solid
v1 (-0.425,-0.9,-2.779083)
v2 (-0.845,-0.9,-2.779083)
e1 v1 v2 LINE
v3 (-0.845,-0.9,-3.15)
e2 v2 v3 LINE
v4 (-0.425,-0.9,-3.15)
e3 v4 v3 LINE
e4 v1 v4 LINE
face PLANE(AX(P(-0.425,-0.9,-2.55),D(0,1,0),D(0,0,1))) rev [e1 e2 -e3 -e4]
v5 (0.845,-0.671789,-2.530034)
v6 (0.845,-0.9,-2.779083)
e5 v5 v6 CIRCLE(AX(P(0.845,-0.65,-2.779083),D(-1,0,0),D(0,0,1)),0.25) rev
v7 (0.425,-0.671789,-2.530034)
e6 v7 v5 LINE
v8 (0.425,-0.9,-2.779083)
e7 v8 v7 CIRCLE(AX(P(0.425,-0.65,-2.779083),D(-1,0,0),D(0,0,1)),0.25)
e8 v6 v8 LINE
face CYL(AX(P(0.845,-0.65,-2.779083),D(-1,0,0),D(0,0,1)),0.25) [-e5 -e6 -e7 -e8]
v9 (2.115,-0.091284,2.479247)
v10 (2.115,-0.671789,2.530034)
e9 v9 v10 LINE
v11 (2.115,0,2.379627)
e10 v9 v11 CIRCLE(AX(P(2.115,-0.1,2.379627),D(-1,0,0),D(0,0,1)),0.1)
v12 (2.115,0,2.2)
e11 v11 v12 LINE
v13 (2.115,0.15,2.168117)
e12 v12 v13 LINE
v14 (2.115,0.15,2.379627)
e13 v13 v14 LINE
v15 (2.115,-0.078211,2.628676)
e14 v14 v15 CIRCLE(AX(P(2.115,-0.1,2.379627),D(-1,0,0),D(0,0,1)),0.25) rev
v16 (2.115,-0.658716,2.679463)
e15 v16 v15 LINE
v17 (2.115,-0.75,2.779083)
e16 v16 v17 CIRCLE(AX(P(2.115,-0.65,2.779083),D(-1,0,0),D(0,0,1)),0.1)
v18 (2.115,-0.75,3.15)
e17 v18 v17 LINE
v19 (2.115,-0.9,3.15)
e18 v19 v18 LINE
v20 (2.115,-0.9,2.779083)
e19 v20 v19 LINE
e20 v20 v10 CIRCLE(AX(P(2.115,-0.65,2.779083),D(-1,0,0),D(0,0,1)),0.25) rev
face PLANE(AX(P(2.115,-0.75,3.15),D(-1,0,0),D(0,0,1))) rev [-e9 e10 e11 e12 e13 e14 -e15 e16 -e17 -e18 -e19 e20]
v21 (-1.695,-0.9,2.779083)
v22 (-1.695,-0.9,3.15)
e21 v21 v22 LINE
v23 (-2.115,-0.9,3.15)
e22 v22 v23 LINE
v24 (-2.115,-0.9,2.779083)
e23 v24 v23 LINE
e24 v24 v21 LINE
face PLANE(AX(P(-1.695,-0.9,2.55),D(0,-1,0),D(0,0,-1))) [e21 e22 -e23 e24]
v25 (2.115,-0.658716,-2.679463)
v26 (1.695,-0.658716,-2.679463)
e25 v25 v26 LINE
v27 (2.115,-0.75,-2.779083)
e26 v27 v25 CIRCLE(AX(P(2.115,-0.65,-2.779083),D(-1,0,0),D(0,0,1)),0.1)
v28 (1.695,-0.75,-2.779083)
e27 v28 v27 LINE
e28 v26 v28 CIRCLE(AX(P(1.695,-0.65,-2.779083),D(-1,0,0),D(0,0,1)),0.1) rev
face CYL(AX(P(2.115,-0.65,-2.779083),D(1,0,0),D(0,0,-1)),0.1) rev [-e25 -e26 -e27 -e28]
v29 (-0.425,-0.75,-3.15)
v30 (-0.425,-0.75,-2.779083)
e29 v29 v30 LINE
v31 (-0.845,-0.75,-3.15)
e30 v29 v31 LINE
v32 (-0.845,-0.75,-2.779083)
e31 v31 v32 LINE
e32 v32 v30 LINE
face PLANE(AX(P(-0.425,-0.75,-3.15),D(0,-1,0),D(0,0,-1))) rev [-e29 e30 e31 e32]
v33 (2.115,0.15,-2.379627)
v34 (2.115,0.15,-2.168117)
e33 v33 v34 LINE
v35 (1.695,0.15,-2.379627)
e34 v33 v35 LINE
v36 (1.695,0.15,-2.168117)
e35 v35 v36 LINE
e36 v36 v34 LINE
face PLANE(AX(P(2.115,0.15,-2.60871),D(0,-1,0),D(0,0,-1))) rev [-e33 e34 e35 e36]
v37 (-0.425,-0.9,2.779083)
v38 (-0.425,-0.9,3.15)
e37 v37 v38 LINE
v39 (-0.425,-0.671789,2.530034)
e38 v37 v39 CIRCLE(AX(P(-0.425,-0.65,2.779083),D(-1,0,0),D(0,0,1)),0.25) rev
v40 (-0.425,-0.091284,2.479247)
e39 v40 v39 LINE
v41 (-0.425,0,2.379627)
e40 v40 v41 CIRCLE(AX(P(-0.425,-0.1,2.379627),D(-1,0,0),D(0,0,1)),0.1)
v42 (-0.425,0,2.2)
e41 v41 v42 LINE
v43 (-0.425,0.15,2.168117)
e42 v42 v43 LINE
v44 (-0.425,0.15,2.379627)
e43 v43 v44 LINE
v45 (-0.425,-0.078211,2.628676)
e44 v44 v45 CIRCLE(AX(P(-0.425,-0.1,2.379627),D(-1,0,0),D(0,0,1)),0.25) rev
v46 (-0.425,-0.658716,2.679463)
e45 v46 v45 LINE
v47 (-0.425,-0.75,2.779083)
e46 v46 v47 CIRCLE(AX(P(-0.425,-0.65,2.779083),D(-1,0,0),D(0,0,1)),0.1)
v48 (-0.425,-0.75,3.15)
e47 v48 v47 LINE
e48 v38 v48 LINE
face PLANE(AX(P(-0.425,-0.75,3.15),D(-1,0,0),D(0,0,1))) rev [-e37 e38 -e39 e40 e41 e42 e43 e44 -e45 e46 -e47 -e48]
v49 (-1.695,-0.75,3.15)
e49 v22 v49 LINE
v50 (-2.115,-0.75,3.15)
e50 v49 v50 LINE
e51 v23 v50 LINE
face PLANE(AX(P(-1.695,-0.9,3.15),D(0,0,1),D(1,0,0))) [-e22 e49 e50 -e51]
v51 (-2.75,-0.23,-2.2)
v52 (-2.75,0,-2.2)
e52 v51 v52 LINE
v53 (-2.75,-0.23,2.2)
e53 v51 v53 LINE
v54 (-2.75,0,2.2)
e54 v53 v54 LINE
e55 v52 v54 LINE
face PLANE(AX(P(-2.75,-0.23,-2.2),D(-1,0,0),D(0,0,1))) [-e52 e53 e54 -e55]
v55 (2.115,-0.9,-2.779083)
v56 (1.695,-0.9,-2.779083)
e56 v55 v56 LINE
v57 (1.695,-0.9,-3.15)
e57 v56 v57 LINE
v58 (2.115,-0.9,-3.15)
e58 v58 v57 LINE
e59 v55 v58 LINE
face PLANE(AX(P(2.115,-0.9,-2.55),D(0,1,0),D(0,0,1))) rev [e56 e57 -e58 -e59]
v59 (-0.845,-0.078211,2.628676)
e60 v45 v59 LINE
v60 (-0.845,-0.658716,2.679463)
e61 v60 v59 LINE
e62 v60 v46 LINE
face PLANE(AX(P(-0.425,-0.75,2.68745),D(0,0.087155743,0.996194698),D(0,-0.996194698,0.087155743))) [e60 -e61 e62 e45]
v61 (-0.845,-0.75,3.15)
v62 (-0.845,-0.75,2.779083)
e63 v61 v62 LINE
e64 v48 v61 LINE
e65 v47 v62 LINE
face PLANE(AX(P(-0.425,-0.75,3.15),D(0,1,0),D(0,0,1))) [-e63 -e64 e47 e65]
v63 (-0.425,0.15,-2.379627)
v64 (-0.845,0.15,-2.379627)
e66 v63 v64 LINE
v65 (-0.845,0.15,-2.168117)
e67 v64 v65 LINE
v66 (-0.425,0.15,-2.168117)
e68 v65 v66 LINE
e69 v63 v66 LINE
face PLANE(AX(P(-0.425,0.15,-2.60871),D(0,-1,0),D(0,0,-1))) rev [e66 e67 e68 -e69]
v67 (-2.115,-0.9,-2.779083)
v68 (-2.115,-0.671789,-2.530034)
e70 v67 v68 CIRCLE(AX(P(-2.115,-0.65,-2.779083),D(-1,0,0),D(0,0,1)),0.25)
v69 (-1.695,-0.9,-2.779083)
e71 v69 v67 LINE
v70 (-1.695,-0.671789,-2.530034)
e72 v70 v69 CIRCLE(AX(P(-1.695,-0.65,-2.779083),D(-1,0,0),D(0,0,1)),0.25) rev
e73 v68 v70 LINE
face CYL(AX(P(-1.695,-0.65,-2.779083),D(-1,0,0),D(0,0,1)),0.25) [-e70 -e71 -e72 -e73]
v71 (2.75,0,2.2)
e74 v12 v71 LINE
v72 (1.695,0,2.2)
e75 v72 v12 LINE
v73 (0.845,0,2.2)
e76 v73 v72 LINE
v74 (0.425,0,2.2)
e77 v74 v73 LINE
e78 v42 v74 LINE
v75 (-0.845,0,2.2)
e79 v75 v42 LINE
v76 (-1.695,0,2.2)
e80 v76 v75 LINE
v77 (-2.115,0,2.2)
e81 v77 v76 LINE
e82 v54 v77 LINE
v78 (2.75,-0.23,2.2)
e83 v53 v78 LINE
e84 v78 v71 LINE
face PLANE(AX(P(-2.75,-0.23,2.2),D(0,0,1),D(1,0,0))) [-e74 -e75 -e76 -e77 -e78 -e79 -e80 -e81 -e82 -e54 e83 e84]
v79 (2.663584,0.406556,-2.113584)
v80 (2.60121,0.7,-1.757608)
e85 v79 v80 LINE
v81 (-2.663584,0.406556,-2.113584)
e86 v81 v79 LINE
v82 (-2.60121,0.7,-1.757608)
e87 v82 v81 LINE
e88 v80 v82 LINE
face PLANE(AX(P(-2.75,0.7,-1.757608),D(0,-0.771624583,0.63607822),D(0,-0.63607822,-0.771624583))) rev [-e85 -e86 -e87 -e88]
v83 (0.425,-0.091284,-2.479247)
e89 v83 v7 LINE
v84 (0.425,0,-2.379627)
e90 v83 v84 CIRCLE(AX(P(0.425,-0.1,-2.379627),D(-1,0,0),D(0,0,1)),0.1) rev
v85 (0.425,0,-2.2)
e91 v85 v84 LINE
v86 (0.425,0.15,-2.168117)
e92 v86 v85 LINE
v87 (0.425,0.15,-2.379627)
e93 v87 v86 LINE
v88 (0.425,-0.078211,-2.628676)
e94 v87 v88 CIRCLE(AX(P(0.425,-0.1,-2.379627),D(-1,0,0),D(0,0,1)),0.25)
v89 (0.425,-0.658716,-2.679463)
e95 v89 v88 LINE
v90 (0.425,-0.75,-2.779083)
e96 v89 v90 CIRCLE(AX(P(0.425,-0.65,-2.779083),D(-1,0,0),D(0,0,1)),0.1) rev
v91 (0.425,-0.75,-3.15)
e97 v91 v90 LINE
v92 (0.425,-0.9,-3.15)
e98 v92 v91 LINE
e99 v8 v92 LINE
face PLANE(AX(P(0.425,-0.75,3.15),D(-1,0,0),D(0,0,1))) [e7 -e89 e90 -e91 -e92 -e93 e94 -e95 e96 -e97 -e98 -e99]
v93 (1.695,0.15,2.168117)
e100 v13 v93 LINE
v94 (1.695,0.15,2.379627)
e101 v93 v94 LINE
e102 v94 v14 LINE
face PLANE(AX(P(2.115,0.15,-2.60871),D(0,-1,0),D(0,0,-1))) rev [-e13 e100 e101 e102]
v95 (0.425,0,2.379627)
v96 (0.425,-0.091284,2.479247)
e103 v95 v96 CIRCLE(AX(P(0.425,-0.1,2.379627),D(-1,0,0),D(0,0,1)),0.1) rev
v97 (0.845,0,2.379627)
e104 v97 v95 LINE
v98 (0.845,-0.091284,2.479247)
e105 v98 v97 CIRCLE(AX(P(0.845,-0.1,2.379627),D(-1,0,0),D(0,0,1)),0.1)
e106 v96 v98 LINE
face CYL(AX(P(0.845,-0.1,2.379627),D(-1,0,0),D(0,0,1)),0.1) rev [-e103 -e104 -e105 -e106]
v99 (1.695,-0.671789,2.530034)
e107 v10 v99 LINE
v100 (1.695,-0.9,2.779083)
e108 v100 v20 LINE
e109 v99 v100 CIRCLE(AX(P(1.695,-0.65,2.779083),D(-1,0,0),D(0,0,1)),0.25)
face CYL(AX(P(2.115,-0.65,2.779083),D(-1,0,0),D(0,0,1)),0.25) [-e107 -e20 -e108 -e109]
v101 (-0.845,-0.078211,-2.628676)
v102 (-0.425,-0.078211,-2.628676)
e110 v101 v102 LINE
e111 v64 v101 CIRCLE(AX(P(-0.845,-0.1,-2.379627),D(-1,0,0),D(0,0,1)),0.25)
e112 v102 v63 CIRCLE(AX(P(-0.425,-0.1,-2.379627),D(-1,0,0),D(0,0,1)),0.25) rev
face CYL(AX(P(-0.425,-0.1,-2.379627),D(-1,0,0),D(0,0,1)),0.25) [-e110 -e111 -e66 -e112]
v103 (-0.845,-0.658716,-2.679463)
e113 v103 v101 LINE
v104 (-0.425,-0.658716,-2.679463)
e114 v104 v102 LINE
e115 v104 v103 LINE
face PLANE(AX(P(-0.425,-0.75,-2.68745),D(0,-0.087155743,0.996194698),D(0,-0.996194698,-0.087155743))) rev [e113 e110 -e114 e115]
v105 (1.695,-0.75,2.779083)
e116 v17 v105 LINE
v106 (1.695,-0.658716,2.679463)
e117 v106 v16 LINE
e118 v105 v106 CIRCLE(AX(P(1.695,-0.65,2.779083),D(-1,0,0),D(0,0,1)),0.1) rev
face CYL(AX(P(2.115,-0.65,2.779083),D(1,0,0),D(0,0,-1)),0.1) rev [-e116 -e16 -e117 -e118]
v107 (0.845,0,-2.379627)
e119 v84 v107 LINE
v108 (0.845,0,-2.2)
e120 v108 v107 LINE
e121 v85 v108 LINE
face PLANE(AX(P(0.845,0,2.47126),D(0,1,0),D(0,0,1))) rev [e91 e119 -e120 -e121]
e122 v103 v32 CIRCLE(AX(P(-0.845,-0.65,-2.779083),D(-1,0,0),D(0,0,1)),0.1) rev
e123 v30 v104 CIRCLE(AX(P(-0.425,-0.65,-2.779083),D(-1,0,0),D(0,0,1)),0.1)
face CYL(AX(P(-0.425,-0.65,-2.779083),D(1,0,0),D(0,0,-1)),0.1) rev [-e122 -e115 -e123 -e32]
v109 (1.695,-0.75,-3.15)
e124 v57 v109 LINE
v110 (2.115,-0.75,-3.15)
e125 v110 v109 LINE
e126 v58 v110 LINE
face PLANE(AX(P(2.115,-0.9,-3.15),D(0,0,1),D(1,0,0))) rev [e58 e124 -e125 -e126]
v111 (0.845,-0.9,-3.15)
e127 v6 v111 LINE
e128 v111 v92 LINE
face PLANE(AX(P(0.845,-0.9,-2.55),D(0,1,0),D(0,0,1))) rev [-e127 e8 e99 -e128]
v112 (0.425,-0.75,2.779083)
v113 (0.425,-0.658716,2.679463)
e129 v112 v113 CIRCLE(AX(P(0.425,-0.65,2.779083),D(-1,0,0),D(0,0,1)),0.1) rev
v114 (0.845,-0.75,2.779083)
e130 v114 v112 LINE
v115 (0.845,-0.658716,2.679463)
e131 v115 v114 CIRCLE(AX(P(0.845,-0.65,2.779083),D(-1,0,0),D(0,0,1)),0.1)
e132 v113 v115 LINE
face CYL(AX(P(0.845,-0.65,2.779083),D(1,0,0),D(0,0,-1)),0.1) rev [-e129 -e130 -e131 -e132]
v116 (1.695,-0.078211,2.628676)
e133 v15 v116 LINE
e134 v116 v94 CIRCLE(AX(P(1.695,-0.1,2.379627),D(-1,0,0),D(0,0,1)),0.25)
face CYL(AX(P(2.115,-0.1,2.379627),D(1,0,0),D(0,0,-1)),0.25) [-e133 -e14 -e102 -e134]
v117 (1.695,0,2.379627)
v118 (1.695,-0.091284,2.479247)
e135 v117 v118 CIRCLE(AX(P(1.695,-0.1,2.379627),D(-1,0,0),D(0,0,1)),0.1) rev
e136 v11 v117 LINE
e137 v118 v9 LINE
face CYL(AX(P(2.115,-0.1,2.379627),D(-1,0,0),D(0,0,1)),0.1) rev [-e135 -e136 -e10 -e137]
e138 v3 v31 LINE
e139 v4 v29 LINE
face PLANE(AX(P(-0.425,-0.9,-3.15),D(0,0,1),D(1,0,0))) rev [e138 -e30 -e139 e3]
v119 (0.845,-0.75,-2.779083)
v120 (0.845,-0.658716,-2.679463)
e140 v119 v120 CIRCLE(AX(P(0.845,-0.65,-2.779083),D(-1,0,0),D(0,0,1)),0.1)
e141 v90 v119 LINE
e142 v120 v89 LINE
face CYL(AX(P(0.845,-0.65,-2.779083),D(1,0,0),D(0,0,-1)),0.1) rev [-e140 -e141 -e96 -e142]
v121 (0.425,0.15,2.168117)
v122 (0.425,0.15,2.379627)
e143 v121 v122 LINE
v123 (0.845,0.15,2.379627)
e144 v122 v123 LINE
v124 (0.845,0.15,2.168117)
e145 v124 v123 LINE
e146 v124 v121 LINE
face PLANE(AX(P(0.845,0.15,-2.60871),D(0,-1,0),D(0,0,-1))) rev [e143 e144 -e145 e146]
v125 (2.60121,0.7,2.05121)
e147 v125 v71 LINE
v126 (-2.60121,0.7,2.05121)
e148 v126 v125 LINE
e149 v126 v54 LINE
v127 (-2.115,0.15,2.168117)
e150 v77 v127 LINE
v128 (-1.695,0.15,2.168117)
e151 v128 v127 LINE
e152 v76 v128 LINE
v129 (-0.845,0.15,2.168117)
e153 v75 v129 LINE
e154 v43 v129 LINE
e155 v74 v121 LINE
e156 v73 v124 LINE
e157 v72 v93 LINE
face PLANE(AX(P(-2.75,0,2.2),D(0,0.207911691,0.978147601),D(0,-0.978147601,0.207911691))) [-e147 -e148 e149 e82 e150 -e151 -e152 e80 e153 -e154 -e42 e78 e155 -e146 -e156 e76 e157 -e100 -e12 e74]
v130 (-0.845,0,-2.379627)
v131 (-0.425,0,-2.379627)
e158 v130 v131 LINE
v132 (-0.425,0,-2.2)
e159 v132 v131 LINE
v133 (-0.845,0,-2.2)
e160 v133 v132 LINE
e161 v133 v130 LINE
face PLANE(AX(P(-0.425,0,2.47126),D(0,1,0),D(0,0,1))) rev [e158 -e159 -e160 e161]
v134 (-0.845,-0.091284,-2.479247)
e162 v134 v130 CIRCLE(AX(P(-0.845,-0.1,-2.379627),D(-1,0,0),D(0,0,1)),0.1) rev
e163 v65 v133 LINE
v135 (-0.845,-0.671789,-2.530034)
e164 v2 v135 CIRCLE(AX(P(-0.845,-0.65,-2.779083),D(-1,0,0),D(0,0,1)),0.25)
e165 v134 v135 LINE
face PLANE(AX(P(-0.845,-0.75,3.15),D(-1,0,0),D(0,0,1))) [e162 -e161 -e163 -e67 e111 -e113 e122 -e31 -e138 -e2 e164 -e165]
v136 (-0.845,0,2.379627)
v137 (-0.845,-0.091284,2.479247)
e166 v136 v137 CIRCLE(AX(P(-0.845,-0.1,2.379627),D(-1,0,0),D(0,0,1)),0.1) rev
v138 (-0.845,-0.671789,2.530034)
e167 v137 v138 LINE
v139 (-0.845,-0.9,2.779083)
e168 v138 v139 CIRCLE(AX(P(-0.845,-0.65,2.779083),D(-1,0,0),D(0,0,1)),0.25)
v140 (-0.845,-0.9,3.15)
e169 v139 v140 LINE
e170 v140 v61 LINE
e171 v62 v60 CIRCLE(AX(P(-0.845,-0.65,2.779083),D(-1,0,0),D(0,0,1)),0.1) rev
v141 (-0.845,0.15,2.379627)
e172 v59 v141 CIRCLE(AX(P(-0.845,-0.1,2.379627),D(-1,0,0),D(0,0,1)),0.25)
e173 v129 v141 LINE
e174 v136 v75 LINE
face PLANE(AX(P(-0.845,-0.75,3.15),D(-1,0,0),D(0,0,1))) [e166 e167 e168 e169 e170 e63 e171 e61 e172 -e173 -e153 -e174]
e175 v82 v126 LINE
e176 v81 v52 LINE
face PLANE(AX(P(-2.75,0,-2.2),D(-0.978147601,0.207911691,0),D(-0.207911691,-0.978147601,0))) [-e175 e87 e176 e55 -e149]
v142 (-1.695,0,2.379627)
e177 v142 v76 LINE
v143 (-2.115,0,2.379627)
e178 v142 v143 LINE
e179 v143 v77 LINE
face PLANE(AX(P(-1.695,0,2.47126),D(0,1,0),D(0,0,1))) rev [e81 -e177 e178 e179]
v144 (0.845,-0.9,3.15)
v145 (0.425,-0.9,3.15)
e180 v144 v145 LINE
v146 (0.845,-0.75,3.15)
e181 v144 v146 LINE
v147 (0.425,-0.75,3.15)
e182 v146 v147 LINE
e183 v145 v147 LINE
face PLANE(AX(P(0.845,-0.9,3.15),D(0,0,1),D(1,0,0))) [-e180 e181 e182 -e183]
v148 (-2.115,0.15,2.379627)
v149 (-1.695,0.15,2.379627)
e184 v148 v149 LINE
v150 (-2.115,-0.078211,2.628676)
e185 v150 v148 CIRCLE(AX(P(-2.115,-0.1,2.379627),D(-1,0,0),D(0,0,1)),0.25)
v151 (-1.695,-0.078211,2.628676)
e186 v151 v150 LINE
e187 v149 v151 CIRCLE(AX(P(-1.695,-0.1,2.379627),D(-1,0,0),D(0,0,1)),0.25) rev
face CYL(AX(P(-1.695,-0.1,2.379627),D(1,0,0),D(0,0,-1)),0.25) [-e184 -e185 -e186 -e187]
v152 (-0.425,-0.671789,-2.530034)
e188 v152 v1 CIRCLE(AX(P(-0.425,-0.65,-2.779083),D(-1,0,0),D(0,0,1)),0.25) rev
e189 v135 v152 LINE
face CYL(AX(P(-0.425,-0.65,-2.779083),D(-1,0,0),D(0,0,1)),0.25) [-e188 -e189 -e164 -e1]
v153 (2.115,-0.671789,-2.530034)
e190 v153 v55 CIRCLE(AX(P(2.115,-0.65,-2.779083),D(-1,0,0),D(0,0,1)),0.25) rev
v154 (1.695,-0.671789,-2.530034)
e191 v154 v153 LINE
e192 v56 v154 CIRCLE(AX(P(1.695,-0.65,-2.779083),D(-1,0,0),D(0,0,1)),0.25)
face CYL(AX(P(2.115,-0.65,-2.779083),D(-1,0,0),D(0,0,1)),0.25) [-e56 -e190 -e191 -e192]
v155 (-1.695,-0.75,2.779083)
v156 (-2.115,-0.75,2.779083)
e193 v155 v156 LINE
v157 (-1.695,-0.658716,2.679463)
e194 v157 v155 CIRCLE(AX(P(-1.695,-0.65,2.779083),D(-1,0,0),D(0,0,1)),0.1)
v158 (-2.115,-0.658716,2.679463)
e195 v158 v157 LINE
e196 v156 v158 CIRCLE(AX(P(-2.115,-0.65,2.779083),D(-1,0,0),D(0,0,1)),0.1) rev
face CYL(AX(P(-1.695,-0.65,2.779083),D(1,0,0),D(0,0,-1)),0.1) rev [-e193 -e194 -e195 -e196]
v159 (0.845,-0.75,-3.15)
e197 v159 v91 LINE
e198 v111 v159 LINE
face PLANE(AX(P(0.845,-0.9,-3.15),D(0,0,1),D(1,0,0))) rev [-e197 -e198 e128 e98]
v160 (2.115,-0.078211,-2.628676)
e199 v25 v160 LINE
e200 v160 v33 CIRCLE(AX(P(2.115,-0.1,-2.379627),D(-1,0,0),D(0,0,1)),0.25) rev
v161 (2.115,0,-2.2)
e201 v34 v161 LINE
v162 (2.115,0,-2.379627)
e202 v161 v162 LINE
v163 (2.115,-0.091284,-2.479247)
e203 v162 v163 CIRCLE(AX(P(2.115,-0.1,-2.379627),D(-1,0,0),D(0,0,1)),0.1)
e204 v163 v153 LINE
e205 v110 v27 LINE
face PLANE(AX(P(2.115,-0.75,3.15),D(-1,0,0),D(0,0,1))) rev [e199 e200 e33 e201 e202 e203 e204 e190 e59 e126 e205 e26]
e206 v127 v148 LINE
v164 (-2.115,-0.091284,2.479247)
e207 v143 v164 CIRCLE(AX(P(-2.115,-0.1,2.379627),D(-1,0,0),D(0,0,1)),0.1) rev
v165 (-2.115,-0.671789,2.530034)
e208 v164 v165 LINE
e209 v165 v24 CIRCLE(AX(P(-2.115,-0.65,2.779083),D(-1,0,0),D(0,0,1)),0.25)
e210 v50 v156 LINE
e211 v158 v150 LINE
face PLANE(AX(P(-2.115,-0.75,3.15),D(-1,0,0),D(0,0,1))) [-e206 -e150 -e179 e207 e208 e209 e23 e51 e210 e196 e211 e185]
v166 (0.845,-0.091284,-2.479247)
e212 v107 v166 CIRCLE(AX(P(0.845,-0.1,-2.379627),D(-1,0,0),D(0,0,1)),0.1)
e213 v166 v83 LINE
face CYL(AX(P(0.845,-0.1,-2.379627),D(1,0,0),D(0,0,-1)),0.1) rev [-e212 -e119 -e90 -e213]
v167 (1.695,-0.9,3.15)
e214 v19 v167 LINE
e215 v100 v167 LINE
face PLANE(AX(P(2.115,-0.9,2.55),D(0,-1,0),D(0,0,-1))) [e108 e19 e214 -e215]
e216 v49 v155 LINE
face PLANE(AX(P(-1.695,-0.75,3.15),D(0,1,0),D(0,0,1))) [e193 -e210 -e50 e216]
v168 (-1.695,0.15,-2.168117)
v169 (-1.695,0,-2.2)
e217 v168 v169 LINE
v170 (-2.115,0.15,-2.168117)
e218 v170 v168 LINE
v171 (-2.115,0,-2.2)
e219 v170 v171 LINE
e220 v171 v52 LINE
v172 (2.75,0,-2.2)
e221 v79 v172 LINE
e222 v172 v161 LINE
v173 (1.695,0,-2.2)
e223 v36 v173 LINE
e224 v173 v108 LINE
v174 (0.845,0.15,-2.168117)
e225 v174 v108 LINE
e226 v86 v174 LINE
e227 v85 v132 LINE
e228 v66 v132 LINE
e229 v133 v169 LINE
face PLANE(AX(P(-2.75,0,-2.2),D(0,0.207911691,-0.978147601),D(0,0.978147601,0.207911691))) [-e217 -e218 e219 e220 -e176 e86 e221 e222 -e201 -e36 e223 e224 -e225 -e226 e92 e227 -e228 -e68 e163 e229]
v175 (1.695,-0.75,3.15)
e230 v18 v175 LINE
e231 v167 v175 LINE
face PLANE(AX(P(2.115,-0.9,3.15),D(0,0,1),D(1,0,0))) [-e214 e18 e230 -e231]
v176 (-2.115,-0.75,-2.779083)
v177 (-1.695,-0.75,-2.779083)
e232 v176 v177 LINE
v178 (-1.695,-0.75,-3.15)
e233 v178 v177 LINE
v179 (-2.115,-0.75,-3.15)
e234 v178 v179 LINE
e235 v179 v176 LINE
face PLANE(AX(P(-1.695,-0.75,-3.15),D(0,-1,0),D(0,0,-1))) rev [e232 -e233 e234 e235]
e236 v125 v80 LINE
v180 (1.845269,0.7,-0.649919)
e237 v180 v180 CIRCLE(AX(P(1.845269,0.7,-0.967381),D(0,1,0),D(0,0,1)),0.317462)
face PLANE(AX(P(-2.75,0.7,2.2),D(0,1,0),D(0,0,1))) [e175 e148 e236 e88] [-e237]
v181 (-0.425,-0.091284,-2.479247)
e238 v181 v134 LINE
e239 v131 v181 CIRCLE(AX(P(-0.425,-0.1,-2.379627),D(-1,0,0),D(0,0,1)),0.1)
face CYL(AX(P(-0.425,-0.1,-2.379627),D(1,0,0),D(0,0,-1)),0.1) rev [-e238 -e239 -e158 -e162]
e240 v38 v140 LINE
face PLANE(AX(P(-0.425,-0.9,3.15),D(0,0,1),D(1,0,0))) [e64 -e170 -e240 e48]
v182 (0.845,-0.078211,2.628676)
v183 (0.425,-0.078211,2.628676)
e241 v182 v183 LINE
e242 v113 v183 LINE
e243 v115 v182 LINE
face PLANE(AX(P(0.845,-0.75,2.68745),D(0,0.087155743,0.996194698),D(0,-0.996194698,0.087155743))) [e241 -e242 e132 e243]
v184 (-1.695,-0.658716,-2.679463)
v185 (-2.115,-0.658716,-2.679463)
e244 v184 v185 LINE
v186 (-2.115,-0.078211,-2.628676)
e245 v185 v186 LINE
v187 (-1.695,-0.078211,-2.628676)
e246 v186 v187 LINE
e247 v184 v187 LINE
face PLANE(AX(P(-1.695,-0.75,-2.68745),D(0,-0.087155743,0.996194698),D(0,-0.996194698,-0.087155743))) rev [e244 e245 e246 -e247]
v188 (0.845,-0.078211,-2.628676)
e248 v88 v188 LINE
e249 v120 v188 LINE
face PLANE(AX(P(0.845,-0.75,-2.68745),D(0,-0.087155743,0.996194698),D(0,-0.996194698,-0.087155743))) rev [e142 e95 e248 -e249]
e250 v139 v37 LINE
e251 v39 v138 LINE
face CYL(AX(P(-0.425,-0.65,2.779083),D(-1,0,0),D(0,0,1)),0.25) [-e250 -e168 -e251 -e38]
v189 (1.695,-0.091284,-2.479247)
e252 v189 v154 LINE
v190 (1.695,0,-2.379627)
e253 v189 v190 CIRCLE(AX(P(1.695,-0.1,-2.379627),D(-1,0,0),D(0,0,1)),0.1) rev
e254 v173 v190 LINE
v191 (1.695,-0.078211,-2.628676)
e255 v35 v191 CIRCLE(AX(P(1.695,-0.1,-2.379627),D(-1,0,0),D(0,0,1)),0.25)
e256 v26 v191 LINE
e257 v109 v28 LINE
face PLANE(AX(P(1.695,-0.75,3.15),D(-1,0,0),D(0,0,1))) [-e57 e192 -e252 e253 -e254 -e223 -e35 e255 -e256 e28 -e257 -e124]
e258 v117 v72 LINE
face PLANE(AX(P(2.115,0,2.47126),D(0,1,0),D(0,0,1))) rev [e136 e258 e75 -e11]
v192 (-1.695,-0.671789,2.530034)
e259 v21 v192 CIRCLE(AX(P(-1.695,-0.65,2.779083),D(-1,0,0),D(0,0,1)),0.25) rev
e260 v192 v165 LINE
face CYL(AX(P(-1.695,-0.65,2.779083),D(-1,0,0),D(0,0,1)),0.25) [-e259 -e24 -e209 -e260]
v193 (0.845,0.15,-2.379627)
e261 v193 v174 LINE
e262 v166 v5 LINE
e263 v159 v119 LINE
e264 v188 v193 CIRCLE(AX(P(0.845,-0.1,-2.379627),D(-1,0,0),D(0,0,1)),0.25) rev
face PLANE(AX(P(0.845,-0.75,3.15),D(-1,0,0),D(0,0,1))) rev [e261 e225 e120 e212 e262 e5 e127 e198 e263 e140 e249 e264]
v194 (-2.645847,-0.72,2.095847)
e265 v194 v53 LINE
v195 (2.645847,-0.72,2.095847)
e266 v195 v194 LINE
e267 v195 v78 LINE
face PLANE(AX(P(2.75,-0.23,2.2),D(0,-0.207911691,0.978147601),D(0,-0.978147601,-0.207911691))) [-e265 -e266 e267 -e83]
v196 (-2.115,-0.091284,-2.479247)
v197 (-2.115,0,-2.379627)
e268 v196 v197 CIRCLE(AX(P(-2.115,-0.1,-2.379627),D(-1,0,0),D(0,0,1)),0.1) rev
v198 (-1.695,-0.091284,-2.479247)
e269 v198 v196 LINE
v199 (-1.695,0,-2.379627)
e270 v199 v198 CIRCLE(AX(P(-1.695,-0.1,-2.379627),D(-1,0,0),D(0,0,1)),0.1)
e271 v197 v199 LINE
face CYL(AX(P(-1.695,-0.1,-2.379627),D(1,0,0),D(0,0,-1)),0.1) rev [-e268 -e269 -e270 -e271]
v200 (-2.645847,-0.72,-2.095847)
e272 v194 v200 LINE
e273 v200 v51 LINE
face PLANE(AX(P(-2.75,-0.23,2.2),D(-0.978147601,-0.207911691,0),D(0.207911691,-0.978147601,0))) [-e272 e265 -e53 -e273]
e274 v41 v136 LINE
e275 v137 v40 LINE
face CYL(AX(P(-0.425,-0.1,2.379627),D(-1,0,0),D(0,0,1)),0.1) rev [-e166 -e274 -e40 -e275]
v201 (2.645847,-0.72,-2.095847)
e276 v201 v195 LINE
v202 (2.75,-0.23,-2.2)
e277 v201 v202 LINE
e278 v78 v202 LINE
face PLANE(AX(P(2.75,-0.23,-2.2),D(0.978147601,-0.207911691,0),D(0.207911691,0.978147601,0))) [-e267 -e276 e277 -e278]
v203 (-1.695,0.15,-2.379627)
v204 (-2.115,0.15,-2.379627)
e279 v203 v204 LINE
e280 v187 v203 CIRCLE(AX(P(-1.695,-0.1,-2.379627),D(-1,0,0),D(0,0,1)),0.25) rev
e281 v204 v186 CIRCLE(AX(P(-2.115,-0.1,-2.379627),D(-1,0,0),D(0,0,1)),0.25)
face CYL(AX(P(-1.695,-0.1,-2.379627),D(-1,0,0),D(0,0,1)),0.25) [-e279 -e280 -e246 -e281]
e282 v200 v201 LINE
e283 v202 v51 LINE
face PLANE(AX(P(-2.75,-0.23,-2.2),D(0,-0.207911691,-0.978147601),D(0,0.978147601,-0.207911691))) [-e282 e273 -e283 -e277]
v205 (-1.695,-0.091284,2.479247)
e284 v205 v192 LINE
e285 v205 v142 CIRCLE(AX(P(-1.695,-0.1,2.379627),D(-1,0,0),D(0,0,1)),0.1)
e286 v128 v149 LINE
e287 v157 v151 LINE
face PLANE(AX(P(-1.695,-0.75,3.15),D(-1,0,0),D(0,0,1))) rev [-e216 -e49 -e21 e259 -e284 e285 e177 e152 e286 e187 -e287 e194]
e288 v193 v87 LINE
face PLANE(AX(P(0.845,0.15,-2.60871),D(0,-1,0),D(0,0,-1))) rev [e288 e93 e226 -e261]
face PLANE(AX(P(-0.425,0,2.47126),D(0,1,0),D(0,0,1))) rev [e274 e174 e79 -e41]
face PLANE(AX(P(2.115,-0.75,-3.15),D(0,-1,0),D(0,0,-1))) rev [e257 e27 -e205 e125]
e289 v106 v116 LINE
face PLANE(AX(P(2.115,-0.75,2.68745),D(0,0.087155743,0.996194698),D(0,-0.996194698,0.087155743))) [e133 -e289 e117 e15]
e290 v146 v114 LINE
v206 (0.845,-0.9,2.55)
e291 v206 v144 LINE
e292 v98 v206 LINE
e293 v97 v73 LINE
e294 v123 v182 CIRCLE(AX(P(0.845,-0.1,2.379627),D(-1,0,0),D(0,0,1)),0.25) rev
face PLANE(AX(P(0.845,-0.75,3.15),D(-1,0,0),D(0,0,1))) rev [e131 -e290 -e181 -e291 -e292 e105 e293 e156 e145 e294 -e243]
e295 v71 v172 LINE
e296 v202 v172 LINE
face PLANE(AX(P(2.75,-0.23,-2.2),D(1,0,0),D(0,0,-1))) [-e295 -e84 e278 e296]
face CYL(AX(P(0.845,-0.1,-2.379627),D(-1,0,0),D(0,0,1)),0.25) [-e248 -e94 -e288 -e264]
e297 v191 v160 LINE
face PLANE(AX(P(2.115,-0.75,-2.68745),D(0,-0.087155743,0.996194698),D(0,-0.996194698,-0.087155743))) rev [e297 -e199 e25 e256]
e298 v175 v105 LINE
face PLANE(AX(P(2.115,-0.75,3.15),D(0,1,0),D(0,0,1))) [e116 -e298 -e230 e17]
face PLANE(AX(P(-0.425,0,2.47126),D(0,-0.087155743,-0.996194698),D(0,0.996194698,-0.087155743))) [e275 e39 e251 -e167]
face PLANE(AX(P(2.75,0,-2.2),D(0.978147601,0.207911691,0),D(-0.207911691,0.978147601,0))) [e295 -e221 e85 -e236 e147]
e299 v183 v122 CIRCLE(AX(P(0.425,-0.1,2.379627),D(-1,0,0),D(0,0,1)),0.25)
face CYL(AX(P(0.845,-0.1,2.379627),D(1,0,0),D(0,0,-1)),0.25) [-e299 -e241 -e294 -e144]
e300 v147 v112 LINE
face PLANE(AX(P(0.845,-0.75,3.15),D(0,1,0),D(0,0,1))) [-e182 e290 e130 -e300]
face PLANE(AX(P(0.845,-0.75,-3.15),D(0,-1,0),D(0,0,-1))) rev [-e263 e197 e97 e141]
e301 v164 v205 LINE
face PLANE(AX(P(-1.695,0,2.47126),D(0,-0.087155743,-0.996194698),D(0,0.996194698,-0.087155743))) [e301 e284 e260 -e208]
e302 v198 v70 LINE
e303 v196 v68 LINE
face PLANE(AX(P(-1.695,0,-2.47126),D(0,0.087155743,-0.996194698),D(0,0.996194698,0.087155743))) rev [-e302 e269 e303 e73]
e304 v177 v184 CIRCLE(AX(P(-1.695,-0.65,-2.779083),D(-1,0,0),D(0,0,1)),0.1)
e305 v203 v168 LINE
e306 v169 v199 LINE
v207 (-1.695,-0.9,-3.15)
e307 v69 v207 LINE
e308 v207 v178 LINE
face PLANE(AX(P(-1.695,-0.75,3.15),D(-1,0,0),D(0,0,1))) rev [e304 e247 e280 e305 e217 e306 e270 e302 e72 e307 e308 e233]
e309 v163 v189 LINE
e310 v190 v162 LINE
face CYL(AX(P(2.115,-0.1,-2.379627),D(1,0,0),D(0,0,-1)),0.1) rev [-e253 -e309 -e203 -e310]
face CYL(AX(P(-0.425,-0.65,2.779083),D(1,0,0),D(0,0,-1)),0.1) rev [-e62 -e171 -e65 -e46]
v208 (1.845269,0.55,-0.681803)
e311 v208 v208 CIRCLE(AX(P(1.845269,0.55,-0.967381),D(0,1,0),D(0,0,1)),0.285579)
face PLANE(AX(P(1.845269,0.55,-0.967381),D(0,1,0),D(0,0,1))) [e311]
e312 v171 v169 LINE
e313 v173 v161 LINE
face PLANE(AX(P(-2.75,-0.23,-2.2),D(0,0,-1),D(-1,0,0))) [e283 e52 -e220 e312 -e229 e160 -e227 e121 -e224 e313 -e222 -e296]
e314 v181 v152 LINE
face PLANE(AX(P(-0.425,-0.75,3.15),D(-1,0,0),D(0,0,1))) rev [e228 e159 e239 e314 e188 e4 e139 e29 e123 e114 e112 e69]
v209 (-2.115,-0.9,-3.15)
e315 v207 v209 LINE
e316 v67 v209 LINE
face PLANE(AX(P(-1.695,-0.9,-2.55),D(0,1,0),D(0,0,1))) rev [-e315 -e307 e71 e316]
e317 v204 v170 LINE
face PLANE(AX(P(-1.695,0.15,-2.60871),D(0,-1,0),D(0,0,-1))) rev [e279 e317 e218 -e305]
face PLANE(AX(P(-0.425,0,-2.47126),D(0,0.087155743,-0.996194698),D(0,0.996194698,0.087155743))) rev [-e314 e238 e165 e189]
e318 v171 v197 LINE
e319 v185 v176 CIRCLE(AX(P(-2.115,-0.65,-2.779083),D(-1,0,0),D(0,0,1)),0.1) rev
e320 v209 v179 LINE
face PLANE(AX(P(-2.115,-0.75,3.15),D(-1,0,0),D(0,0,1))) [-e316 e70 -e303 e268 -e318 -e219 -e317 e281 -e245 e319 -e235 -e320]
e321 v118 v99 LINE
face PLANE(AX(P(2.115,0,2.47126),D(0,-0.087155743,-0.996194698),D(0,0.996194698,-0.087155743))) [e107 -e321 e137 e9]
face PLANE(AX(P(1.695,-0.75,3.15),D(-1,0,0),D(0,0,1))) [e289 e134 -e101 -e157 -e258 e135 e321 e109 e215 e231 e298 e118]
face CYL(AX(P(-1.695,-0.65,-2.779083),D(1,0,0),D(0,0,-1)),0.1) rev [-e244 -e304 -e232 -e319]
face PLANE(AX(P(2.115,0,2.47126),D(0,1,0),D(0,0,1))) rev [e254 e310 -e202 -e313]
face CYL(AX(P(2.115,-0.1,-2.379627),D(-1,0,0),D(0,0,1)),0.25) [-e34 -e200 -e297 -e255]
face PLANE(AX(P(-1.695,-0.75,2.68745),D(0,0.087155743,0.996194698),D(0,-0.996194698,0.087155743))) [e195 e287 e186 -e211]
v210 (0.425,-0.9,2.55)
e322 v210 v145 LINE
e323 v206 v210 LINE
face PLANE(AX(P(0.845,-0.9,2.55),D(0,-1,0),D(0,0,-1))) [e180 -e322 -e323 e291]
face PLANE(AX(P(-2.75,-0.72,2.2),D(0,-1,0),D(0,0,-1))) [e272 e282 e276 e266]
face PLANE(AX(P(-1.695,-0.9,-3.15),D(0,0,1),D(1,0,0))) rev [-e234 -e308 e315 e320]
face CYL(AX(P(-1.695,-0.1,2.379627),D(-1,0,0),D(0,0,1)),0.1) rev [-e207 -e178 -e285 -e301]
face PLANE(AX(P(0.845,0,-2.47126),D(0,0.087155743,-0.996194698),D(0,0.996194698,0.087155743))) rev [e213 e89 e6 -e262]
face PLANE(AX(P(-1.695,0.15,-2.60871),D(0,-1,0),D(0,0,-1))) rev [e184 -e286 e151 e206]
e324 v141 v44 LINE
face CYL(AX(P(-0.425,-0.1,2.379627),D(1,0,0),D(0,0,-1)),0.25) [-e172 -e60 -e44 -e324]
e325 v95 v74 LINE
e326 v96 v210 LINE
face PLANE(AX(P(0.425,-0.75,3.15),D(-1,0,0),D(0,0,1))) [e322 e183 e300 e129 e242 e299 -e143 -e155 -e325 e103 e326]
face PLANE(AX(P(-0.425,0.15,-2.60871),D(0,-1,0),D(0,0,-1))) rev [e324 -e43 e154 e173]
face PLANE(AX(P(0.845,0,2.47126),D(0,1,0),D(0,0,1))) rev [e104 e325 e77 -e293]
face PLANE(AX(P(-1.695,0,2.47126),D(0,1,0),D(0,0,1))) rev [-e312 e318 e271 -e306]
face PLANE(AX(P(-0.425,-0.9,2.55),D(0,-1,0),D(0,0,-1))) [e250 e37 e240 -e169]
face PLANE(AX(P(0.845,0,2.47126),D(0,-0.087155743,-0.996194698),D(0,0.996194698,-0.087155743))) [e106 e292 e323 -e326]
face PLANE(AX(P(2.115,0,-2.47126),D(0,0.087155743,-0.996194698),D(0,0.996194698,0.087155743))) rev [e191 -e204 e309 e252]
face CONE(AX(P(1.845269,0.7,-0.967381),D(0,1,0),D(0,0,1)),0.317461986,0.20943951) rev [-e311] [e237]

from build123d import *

# Parameters (mm, degrees)
SKETCH1_W                = 5.5
SKETCH1_H                = 4.4
EXTRUDE1_DEPTH           = 0.7
EXTRUDE1_TAPER           = 12
EXTRUDE1_OTHER_WAY_DEPTH = 0.23
SKETCH2_W                = 5.5
SKETCH2_H                = 4.4
EXTRUDE2_DEPTH           = 0.49
EXTRUDE2_TAPER           = 12
CHAMFER1_SIZE            = 0.29360287
CHAMFER1_SIZE_2          = 0.3
SKETCH3_R                = 0.317461986
CUT_EXTRUDE1_DEPTH       = 0.15
CUT_EXTRUDE1_DRAFT       = -12
EXTRUDE3_START           = 0.635
EXTRUDE3_DEPTH           = 0.21
LPATTERN3_COUNT          = 2
LPATTERN3_PITCH          = 1.27
LPATTERN3_COL_COUNT      = 3
LPATTERN3_COL_PITCH      = 1.27
FILLET1_R                = 0.1
FILLET2_R                = 0.25


with BuildPart() as part:
    # Sketch1 → Extrude1 (new body)
    with BuildSketch(Plane(origin=(0, 0, 0), x_dir=(1, 0, 0), z_dir=(0, 1, 0))):
        Rectangle(SKETCH1_W, SKETCH1_H)
    extrude(amount=EXTRUDE1_DEPTH, taper=EXTRUDE1_TAPER)

    # Sketch1 → Extrude1 other way (add)
    with BuildSketch(Plane(origin=(0, 0, 0), x_dir=(1, 0, 0), z_dir=(0, 1, 0))):
        Rectangle(SKETCH1_W, SKETCH1_H)
    extrude(amount=-EXTRUDE1_OTHER_WAY_DEPTH)

    # Sketch2 → Extrude2 (add)
    with BuildSketch(Plane.XZ.offset(0.23)):
        Rectangle(SKETCH2_W, SKETCH2_H)
    extrude(amount=EXTRUDE2_DEPTH, taper=EXTRUDE2_TAPER)

    # Chamfer1
    # the kernel refuses this chamfer: 0.3, 0.29360287 mm, written as the material it takes off along each edge
    with BuildSketch(Plane(origin=(3.374914076, 0.7, -2.051210407), x_dir=(0, 0.025194664498195945, 0.9996825640576229), z_dir=(-1, 0, 0))) as chamfer1_piece_1:
        Polygon((CHAMFER1_SIZE * 0.999682563914, -CHAMFER1_SIZE * 0.0251946644946), (-CHAMFER1_SIZE_2 * 0.232489792804, -CHAMFER1_SIZE_2 * 0.972598836233), (0, 0), align=None)
    extrude(amount=6.749828151, mode=Mode.SUBTRACT)


with BuildPart() as cut_extrude1_tool:
    # Sketch3 → Cut-Extrude1 (with draft: the straight prism first)
    with BuildSketch(Plane(origin=(0, 0.7, 0), x_dir=(-1, 0, 0), z_dir=(0, 1, 0))):
        with Locations((-1.845269249, -0.967381419)):
            Circle(SKETCH3_R)
    extrude(amount=-CUT_EXTRUDE1_DEPTH)
    # Cut-Extrude1: the draft: its side faces are tilted about the plane it starts from
    cut_extrude1_sides = [cut_extrude1_tool.faces().sort_by_distance(p)[0] for p in [
        (2.162731235, 0.625, -0.967381419),
    ]]
    draft(cut_extrude1_sides, Plane(origin=(0, 0.7, 0), x_dir=(-1, 0, 0), z_dir=(0, 1, 0)), CUT_EXTRUDE1_DRAFT)


with BuildPart() as part_1:
    add(part.part)

    # Cut-Extrude1: cut by cut_extrude1_tool
    add(cut_extrude1_tool.part, mode=Mode.SUBTRACT)

    # Sketch4 → Extrude3 (add, symmetric)
    with BuildSketch(Plane(origin=(0, 0, 0), x_dir=(0, 0, -1), z_dir=(1, 0, 0)).offset(EXTRUDE3_START)):
        Polygon((-2.687449676, -0.75), (-2.608709879, 0.15), (2.608709879, 0.15), (2.687449676, -0.75), (3.15, -0.75), (3.15, -0.9), (2.55, -0.9), (2.471260203, 0), (-2.471260203, 0), (-2.55, -0.9), (-3.15, -0.9), (-3.15, -0.75), align=None)
    extrude3 = extrude(amount=EXTRUDE3_DEPTH, both=True)

    # LPattern3: Extrude3 ×2
    with Locations(*[(i * LPATTERN3_PITCH, 0, 0) for i in range(1, LPATTERN3_COUNT)]):
        add(extrude3)

    # LPattern3 col: Extrude3 ×3
    with Locations(*[(-i * LPATTERN3_COL_PITCH, 0, 0) for i in range(1, LPATTERN3_COL_COUNT)]):
        add(extrude3)

    # Fillet1
    fillet1_edges = [part_1.edges().sort_by_distance(p)[0] for p in [
        (-0.635, -0.75, 2.687449676),
        (-0.635, 0, 2.471260203),
        (-0.635, 0, -2.471260203),
        (-1.905, -0.75, -2.687449676),
        (-1.905, -0.75, 2.687449676),
        (-1.905, 0, 2.471260203),
        (-1.905, 0, -2.471260203),
        (1.905, -0.75, -2.687449676),
        (1.905, -0.75, 2.687449676),
        (1.905, 0, 2.471260203),
        (1.905, 0, -2.471260203),
        (0.635, -0.75, -2.687449676),
        (0.635, -0.75, 2.687449676),
        (0.635, 0, 2.471260203),
        (0.635, 0, -2.471260203),
        (-0.635, -0.75, -2.687449676),
    ]]
    fillet(fillet1_edges, radius=FILLET1_R)

    # Fillet2
    fillet2_edges = [part_1.edges().sort_by_distance(p)[0] for p in [
        (-0.635, -0.9, 2.55),
        (-0.635, -0.9, -2.55),
        (-1.905, 0.15, -2.608709879),
        (-1.905, 0.15, 2.608709879),
        (-1.905, -0.9, 2.55),
        (-1.905, -0.9, -2.55),
        (1.905, 0.15, -2.608709879),
        (1.905, 0.15, 2.608709879),
        (1.905, -0.9, 2.55),
        (1.905, -0.9, -2.55),
        (0.635, 0.15, -2.608709879),
        (0.635, 0.15, 2.608709879),
        (0.635, -0.9, -2.55),
        (-0.635, 0.15, -2.608709879),
        (-0.635, 0.15, 2.608709879),
    ]]
    fillet(fillet2_edges, radius=FILLET2_R)


solid = part_1.part
